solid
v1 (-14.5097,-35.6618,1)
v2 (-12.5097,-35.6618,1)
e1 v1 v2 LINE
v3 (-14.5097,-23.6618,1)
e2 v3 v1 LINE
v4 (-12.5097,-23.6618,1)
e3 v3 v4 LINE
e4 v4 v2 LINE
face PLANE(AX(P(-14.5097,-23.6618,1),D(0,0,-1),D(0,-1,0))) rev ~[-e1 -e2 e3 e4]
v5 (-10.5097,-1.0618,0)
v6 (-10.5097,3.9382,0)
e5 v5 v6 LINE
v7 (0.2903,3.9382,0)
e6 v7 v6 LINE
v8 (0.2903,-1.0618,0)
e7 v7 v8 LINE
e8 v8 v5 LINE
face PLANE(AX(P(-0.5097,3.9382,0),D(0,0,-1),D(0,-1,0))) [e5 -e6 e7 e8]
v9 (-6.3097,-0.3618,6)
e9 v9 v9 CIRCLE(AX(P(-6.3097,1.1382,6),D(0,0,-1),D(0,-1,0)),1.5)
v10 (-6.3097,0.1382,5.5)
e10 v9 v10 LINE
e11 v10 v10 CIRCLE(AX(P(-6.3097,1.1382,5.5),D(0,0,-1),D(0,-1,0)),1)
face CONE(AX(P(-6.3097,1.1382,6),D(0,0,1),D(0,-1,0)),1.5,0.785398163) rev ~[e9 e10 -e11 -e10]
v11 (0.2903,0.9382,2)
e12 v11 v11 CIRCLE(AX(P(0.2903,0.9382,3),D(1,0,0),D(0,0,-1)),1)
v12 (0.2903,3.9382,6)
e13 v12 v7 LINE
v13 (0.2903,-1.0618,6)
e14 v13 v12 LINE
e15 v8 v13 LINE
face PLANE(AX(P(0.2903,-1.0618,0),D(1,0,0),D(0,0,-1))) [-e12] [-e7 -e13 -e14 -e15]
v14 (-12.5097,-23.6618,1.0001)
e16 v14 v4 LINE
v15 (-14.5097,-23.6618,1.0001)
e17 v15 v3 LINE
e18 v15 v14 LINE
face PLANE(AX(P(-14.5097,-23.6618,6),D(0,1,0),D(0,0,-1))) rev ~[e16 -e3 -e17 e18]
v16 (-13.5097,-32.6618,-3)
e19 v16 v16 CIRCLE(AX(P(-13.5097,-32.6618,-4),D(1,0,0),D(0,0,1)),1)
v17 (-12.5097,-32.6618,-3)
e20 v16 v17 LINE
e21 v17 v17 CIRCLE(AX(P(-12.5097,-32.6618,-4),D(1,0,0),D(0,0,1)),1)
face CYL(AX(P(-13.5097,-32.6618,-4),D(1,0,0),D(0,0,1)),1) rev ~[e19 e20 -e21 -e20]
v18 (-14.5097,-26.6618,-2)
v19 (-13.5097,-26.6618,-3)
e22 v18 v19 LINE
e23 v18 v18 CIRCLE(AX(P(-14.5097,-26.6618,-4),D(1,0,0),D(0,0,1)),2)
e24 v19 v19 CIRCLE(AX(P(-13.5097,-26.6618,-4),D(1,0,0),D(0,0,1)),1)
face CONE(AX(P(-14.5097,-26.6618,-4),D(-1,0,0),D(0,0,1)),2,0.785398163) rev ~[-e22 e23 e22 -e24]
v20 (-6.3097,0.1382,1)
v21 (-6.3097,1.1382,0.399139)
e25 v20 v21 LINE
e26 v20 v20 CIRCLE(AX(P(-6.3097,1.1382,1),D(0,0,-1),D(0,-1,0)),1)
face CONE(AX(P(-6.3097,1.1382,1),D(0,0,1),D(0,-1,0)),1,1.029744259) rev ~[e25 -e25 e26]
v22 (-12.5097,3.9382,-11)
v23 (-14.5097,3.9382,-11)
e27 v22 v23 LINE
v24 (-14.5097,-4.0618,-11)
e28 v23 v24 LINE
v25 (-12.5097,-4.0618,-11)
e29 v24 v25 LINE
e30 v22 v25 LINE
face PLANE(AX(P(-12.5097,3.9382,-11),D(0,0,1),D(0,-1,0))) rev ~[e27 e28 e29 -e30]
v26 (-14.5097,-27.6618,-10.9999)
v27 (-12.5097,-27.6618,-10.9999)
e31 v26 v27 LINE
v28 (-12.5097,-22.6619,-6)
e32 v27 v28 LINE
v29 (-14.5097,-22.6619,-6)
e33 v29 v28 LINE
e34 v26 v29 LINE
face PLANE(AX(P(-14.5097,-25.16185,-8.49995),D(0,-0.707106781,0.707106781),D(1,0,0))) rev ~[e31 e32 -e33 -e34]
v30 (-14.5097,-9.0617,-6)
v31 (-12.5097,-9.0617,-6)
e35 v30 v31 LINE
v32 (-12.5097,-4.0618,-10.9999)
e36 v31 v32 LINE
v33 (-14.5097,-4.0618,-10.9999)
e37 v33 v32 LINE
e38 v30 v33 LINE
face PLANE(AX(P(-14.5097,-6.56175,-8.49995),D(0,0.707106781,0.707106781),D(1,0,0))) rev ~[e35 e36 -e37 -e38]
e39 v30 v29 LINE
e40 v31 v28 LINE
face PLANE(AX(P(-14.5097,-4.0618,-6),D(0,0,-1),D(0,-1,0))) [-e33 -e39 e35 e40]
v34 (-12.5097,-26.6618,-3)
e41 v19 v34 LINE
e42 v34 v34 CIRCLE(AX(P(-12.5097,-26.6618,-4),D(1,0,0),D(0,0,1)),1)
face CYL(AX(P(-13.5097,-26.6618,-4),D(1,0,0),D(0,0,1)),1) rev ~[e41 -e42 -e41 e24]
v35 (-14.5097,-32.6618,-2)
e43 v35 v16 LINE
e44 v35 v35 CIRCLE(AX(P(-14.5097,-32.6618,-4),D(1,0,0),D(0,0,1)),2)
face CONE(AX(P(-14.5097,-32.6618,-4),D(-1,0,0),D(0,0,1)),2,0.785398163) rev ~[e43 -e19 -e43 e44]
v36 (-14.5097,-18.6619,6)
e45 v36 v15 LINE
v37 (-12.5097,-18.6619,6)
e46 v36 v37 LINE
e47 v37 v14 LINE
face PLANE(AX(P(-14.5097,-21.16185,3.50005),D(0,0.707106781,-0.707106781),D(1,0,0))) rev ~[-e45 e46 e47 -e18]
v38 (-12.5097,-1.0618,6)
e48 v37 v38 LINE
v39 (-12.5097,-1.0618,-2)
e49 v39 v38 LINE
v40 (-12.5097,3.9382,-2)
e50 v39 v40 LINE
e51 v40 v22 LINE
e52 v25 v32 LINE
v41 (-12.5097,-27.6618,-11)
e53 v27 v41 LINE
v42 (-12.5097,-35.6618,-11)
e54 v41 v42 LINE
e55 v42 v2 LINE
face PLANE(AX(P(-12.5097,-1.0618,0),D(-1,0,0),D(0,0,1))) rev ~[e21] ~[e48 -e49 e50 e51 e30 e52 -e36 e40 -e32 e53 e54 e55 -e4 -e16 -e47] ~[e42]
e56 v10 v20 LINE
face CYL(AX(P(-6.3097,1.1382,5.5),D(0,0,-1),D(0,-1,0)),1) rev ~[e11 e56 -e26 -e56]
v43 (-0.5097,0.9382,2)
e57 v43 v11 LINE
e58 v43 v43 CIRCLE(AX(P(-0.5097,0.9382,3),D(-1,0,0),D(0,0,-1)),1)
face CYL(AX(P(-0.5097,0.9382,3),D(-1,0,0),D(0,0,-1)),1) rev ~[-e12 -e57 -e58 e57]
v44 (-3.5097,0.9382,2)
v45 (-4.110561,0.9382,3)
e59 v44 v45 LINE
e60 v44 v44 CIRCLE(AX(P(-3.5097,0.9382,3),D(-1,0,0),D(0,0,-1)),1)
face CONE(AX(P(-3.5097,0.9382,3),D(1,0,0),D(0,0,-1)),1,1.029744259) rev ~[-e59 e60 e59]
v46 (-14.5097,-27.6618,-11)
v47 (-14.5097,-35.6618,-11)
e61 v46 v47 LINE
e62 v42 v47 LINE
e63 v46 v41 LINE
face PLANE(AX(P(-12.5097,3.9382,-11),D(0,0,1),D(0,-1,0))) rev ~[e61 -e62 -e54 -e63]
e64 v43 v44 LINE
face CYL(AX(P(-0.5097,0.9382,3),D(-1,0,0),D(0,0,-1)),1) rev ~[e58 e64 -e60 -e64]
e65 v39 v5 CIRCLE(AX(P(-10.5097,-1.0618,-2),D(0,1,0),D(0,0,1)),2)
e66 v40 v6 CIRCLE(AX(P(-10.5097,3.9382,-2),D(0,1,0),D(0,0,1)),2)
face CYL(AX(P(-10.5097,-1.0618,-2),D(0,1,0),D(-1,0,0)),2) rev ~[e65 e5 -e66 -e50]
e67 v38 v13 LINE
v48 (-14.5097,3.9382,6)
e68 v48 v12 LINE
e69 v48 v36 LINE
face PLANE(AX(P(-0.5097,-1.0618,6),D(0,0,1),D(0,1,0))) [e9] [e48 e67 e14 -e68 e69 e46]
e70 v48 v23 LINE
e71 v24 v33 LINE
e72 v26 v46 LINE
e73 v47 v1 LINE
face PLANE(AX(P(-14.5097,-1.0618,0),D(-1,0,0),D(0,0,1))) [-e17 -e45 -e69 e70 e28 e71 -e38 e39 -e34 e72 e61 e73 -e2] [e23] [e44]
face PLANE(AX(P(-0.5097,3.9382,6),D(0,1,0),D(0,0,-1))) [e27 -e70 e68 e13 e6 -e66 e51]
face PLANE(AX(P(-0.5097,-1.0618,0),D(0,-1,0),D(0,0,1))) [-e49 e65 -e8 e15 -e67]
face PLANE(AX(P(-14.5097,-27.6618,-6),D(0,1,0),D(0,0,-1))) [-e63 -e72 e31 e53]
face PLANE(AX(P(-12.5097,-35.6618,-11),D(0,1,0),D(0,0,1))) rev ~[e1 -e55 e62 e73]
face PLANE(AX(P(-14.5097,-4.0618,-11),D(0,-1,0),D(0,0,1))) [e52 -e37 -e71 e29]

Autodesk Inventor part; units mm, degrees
ref_plane "YZ Plane" through (0, 0, 0) normal (1, 0, 0) x (0, 1, 0)
ref_plane "XZ Plane" through (0, 0, 0) normal (0, 1, 0) x (-1, 0, 0)
ref_plane "XY Plane" through (0, 0, 0) normal (0, 0, 1) x (1, 0, 0)
sketch "Sketch1" plane through (0, 0, 0) normal (0, 0, 1) x (1, 0, 0)
  line L0 (-12.5097, 3.9382) -> (-0.5097, 3.9382)
  line L1 (-0.5097, 3.9382) -> (-0.5097, -1.0618)
  line L2 (-0.5097, -1.0618) -> (-12.5097, -1.0618)
  line L3 (-12.5097, -1.0618) -> (-12.5097, 3.9382)
  point P0 (0, 0)
  dimension "d0" = 12
  dimension "d1" = 5
extrude "Extrusion1" add sketch "Sketch1" along normal blind 6
sketch "Sketch2" plane through (0, 0, 6) normal (0, 0, 1) x (1, 0, 0)
  line L0 (-0.5097, -1.0618) -> (-0.5097, 3.9382) projected
  line L1 (-0.5097, 3.9382) -> (-12.5097, 3.9382) projected
  point P0 (0, 0)
  point P1 (-6.3097, 1.1382)
  dimension "d4" = 5.8
  dimension "d5" = 2.8
hole "Hole1" at (-6.3097, 1.1382, 6) direction (0, 0, -1) diameter 2 depth 5 tip angle 118 countersink diameter 3 countersink angle 90
sketch "Sketch3" plane through (-0.5097, -1.0618, 0) normal (1, 0, 0) x (0, 0, -1)
  line L0 (0, 5) -> (-6, 5) projected
  line L1 (-6, 0) -> (-6, 5) projected
  point P0 (0, 1.0618)
  point P1 (-3, 2)
  dimension "d13" = 3
  dimension "d14" = 3
hole "Hole2" at (-0.5097, 0.9382, 3) direction (-1, 0, 0) diameter 2 depth 3 tip angle 118
sketch "Sketch4" plane through (-12.5097, -1.0618, 0) normal (-1, 0, 0) x (0, 0, 1)
  line L0 (6, 0) -> (6, 5) projected
  line L1 (6, 5) -> (-11, 5)
  line L2 (-11, 5) -> (-11, -34.6)
  line L3 (-11, -34.6) -> (6, -34.6)
  line L4 (6, -34.6) -> (6, 5)
  point P0 (0, 1.0618)
  dimension "d22" = 17
  dimension "d23" = 39.6
extrude "Extrusion2" add sketch "Sketch4" along normal blind 2
sketch "Sketch5" plane through (-14.5097, -1.0618, 0) normal (-1, 0, 0) x (0, 0, 1)
  line L0 (-11, -34.6) -> (6, -34.6) projected
  line L1 (6, -34.6) -> (6, 5) projected
  point P0 (0, 1.0618)
  point P1 (-4, -25.6)
  point P2 (-4, -31.6)
  dimension "d26" = 3
  dimension "d27" = 9
  dimension "d28" = 10
  dimension "d29" = 10
hole "Hole3" at (-14.5097, -26.6618, -4) at (-14.5097, -32.6618, -4) direction (1, 0, 0) diameter 2 depth 3 tip angle 118 countersink diameter 4 countersink angle 90
sketch "Sketch6" plane through (-0.5097, -1.0618, 0) normal (1, 0, 0) x (0, 0, -1)
  line L0 (-6, 5) -> (11, 5) projected
  line L1 (0, 5) -> (0, 0) projected
  line L2 (-6, 5) -> (0, 5)
  line L3 (0, 5) -> (0, 0)
  line L4 (0, 0) -> (-6, 0)
  line L5 (-6, 0) -> (-6, 5)
  circle A0 centre (-3, 2) radius 1 projected
  circle A1 centre (-3, 2) radius 1
  point P0 (0, 1.0618)
  dimension "d37" = 2
extrude "Extrusion3" add sketch "Sketch6" along normal blind 0.8
sketch "Sketch7" plane through (-14.5097, -35.6618, 6) normal (-1, 0, 0) x (0, 0, 1)
  line L0 (-17, 39.6) -> (-17, 0) projected
  line L1 (-17, 31.6) -> (-12, 31.6)
  line L2 (-12, 31.6) -> (-12, 8)
  line L3 (-12, 8) -> (-17, 8)
  line L4 (-17, 8) -> (-17, 31.6)
  line L5 (0, 39.6) -> (-17, 39.6) projected
  line L6 (-17, 0) -> (0, 0) projected
  point P0 (-6, 35.6618)
  point P1 (-10, 0)
  point P2 (-17, 8)
  dimension "d40" = 5
  dimension "d41" = 8
  dimension "d42" = 8
extrude "Extrusion4" cut sketch "Sketch7" against normal blind 2
chamfer "Chamfer1" distance 5 angle 45 2 edges at (-13.5097, -4.0618, -6) (-13.5097, -27.6618, -6)
fillet "Fillet1" radius 2 1 edges at (-12.5097, 1.4382, 0)
sketch "Sketch8" plane through (-14.5097, -35.6618, 6) normal (-1, 0, 0) x (0, 0, 1)
  line L0 (0, 0) -> (0, 39.6) projected
  line L1 (-17, 0) -> (0, 0) projected
  line L2 (0, 12) -> (-5, 12)
  line L3 (-5, 12) -> (-5, 0)
  line L4 (-5, 0) -> (0, 0)
  line L5 (0, 0) -> (0, 12)
  point P0 (-6, 35.6618)
  point P1 (-10, 0)
  dimension "d49" = 5
  dimension "d50" = 12
extrude "Extrusion5" cut sketch "Sketch8" against normal blind 10
chamfer "Chamfer2" distance 5 angle 45 1 edges at (-13.5097, -23.6618, 6)
properties part number "servo-mount"
